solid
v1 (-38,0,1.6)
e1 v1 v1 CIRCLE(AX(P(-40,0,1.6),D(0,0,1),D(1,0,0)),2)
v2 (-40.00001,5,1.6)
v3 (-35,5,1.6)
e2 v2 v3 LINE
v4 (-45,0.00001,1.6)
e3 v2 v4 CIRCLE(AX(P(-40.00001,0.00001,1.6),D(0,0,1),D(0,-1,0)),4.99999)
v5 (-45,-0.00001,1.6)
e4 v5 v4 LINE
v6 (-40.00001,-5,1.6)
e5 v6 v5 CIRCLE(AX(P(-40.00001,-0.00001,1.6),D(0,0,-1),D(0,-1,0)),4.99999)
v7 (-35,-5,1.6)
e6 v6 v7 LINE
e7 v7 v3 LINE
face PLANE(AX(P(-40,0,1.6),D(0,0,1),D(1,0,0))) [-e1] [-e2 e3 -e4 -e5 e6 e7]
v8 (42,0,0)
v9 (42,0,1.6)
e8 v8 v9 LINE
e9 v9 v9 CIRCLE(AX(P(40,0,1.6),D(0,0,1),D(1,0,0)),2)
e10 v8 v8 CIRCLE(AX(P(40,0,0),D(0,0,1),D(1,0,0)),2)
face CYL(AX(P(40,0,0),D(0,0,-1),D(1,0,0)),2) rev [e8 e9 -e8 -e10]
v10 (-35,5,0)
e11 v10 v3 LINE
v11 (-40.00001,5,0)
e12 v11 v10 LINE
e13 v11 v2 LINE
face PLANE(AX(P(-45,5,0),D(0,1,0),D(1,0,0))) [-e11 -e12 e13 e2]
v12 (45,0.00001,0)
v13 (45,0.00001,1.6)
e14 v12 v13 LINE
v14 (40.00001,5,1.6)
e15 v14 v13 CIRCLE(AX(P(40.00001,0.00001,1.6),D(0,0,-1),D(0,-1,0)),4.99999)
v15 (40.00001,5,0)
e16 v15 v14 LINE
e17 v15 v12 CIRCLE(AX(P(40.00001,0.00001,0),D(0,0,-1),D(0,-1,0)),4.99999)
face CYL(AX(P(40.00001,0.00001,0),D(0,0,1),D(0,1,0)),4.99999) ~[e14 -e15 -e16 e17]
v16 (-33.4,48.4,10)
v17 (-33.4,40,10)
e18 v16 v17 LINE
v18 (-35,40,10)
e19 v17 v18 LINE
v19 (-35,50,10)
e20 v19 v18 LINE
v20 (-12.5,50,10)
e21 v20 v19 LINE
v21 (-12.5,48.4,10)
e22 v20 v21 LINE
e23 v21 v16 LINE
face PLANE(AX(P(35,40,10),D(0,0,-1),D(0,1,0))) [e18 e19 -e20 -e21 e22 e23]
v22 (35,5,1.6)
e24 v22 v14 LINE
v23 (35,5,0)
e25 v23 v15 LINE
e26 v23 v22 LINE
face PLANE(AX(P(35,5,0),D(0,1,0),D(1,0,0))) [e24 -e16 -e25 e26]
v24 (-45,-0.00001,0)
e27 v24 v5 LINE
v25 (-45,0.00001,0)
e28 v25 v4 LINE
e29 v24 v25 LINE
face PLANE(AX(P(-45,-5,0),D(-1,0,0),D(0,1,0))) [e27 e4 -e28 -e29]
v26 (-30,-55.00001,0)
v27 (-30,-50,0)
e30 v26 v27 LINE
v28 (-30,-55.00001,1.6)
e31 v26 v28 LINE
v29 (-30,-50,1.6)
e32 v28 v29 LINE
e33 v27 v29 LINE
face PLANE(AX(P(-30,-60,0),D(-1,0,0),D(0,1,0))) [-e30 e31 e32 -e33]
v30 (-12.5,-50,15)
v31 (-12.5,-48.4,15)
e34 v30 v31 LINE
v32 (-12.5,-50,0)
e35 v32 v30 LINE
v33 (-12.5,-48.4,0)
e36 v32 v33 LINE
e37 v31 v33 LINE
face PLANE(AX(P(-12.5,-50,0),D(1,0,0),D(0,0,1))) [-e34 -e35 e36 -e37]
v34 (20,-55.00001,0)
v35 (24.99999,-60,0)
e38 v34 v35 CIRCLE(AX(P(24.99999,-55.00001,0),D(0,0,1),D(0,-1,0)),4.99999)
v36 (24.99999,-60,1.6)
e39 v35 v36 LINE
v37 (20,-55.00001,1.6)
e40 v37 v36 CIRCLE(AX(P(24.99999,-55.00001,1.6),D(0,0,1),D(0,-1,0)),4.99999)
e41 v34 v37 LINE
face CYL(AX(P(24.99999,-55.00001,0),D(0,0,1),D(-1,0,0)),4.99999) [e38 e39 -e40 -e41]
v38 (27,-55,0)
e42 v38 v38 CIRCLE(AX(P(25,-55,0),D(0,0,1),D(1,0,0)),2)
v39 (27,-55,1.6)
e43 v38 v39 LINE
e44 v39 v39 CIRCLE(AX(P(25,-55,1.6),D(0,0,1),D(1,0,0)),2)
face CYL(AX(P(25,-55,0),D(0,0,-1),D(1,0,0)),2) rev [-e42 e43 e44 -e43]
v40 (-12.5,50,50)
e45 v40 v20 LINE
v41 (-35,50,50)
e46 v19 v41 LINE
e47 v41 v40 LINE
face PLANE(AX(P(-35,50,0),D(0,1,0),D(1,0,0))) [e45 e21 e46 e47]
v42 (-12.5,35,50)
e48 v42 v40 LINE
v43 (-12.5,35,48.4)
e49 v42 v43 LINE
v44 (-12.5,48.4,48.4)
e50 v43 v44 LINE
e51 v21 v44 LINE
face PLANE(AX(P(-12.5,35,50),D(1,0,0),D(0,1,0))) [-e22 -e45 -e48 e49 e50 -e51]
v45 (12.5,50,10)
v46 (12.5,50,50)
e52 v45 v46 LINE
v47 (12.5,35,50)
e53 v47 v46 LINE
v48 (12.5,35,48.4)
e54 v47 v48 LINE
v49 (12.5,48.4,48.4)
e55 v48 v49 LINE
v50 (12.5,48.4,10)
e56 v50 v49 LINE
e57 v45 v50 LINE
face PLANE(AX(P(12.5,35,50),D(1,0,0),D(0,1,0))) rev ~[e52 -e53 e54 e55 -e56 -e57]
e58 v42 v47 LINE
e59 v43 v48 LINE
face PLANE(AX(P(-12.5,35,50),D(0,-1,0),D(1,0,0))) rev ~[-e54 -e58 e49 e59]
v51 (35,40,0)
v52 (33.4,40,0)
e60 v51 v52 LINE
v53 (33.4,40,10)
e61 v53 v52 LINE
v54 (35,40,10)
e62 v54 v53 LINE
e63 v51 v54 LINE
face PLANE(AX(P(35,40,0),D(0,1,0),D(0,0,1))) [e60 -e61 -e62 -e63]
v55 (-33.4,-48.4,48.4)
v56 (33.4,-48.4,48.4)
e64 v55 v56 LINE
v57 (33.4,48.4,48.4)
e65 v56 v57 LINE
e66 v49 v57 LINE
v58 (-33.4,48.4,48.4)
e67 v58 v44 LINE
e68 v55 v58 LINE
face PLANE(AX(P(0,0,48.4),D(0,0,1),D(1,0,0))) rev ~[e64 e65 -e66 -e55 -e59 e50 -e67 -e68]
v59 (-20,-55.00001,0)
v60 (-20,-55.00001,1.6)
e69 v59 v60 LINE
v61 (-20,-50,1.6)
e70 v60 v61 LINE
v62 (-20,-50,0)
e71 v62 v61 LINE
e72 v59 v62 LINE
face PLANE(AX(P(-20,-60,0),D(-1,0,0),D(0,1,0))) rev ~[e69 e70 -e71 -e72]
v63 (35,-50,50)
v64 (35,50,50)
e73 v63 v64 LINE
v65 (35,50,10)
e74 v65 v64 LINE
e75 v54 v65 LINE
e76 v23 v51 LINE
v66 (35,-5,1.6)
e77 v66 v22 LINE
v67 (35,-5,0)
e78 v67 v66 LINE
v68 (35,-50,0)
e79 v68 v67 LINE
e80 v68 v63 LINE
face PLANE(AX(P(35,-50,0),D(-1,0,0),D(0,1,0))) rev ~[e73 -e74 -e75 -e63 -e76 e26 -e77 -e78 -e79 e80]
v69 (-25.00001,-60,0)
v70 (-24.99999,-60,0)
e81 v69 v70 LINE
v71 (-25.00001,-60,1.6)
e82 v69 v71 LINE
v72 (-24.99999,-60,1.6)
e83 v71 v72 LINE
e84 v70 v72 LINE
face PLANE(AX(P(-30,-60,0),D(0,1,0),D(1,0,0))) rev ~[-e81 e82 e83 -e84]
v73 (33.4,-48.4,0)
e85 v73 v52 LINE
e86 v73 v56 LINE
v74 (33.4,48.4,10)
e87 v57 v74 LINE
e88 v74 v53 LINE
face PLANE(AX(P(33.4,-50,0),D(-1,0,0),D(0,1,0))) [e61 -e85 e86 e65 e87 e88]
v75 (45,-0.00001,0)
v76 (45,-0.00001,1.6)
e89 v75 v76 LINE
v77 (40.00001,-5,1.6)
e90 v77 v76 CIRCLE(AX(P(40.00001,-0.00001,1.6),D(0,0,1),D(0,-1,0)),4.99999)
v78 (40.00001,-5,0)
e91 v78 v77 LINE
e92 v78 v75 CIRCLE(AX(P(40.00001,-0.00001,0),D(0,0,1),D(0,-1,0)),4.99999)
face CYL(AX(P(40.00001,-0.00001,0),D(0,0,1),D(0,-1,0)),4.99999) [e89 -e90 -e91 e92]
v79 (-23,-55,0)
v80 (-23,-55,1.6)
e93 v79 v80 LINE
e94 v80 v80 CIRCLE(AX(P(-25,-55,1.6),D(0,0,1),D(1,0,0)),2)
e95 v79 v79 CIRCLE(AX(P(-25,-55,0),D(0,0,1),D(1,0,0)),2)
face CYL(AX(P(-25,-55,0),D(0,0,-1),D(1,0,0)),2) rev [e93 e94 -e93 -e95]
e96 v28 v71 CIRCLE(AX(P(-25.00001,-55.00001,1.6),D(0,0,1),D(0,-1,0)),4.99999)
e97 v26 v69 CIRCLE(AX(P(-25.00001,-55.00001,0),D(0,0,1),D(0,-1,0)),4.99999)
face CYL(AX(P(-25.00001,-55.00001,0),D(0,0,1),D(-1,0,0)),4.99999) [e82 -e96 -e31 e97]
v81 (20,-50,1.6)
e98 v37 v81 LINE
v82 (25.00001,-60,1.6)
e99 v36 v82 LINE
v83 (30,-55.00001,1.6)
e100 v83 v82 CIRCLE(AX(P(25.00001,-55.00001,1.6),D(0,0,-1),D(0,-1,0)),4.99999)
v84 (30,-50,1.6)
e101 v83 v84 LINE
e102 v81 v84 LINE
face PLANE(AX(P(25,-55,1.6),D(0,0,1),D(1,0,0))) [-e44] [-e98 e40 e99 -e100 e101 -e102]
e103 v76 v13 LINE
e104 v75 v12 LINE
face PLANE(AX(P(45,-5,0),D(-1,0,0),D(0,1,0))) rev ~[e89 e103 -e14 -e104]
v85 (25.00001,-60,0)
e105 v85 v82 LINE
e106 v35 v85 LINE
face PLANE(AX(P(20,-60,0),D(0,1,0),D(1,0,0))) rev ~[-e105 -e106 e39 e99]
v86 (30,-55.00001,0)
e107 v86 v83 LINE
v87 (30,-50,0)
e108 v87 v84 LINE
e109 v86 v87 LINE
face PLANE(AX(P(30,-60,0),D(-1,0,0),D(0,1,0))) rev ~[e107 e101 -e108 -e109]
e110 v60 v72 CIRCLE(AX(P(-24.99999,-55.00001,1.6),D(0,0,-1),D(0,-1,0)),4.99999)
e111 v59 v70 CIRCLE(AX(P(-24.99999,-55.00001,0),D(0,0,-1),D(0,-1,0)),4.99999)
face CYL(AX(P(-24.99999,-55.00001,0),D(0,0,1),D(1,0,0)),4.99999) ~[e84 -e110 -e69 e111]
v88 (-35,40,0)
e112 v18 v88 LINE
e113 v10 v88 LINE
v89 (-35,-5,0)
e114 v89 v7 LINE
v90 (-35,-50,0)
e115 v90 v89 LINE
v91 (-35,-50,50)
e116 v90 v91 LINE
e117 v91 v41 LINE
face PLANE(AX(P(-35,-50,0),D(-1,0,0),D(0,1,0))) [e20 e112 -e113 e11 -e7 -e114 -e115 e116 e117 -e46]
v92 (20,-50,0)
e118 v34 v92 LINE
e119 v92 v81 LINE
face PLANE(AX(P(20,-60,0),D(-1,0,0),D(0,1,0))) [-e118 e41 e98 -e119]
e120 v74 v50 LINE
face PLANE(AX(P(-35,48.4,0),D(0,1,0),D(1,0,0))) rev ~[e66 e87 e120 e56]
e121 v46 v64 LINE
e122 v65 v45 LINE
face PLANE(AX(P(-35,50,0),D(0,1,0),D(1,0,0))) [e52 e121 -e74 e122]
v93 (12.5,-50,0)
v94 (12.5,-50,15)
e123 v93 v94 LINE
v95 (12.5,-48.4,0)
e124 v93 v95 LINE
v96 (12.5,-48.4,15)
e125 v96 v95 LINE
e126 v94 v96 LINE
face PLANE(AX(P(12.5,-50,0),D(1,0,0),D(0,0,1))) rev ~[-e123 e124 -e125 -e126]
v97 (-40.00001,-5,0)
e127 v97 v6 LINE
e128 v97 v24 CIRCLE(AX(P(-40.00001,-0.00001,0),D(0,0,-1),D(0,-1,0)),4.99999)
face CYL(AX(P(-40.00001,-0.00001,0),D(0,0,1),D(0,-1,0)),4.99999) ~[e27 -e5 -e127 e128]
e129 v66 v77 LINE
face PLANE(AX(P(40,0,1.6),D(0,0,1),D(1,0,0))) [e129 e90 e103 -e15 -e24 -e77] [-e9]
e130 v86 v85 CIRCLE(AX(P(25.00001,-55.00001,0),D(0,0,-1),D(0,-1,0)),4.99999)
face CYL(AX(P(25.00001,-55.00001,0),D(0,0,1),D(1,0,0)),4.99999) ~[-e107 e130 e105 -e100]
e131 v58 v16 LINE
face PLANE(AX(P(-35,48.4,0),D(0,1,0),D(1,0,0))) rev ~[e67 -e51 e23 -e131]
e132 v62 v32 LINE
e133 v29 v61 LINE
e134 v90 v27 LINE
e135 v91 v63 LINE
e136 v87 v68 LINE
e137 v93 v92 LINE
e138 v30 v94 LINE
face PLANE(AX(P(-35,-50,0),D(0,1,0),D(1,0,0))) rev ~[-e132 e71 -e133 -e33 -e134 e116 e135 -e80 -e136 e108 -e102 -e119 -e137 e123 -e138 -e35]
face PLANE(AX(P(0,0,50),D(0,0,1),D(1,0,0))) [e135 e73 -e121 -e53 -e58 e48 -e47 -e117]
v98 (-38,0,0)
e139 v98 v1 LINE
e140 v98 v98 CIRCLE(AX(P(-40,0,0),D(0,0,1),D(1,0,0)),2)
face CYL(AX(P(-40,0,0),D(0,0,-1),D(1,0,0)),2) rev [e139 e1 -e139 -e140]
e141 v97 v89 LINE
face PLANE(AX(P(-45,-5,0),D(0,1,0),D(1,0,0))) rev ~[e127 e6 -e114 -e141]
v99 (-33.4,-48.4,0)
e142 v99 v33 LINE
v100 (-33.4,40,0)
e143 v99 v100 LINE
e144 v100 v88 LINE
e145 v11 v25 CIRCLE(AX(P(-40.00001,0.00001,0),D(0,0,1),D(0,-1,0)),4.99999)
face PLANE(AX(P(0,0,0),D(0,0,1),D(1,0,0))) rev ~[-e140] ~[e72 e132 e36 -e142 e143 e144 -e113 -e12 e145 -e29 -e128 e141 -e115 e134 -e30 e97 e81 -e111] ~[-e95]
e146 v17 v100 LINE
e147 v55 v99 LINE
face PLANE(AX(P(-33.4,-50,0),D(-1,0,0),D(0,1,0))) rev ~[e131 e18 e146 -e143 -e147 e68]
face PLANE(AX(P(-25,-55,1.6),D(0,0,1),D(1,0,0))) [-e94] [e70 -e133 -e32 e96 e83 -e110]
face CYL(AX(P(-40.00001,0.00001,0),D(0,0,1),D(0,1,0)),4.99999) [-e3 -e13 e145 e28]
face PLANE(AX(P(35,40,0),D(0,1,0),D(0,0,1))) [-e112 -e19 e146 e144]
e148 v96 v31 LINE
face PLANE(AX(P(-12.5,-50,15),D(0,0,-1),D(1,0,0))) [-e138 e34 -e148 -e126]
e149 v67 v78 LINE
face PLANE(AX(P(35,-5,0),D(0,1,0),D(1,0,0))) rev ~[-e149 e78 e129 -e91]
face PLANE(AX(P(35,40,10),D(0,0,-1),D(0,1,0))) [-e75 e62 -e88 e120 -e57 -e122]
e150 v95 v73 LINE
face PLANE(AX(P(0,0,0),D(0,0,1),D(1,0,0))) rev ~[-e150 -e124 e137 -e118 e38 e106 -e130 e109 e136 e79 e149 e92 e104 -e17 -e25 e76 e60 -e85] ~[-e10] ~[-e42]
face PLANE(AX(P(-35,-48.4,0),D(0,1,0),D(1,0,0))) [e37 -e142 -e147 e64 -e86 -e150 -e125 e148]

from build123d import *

# Parameters (mm, degrees)
F0_W      = 70
F0_H      = 100
F1_DEPTH  = 50
F2_T      = -1.6
F3_W      = 10
F3_H      = 10
F4_DEPTH  = 70.001
F5_W      = 10
F5_H      = 10
F5_R      = 2
F6_DEPTH  = 1.6
F7_R      = 4.99999
F8_W      = 25
F8_H      = 15
F9_DEPTH  = 50.001
F10_W     = 25
F10_H     = 15
F11_DEPTH = 100.001


# Not quite as in the source:
# - a fillet or chamfer is up to 0.001 mm smaller than in the source, because OpenCascade refuses the exact size


with BuildPart() as f1:
    # F0 (on Top) → F1 (new body)
    with BuildSketch(Plane.XY):
        Rectangle(F0_W, F0_H)
    extrude(amount=F1_DEPTH)

    # F2
    f2_openings = [f1.faces().sort_by_distance(p)[0] for p in [
        (0, 0, 0),
    ]]
    offset(amount=F2_T, openings=f2_openings)

    # F3 (on face) → F4 (cut, through all)
    with BuildSketch(Plane.YZ.offset(35)):
        with Locations((45, 5)):
            Rectangle(F3_W, F3_H)
    extrude(amount=-F4_DEPTH, mode=Mode.SUBTRACT)

    # F5 (on Top) → F6 (join)
    with BuildSketch(Plane.XY):
        with Locations((40, 0)):
            Rectangle(F5_W, F5_H)
        with Locations((40, 0)):
            Circle(F5_R, mode=Mode.SUBTRACT)
        with Locations((-40, 0)):
            Rectangle(F5_W, F5_H)
        with Locations((-40, 0)):
            Circle(F5_R, mode=Mode.SUBTRACT)
        with Locations((-25, -55)):
            Rectangle(F5_W, F5_H)
        with Locations((-25, -55)):
            Circle(F5_R, mode=Mode.SUBTRACT)
        with Locations((25, -55)):
            Rectangle(F5_W, F5_H)
        with Locations((25, -55)):
            Circle(F5_R, mode=Mode.SUBTRACT)
    extrude(amount=F6_DEPTH)

    # F7 (radius 5 in the source; OpenCascade refuses exactly that, so slightly less here)
    f7_edges = [f1.edges().sort_by_distance(p)[0] for p in [
        (-45, -5, 0.8),
        (-45, 5, 0.8),
        (45, -5, 0.8),
        (45, 5, 0.8),
        (-30, -60, 0.8),
        (-20, -60, 0.8),
        (20, -60, 0.8),
        (30, -60, 0.8),
    ]]
    fillet(f7_edges, radius=F7_R)

    # F8 (on face) → F9 (cut, through all)
    with BuildSketch(Plane.XY.offset(50)):
        with Locations((0, 42.5)):
            Rectangle(F8_W, F8_H)
    extrude(amount=-F9_DEPTH, mode=Mode.SUBTRACT)

    # F10 (on face) → F11 (cut, through all)
    with BuildSketch(Plane.XZ.offset(50)):
        with Locations((0, 7.5)):
            Rectangle(F10_W, F10_H)
    extrude(amount=-F11_DEPTH, mode=Mode.SUBTRACT)


solid = f1.part
